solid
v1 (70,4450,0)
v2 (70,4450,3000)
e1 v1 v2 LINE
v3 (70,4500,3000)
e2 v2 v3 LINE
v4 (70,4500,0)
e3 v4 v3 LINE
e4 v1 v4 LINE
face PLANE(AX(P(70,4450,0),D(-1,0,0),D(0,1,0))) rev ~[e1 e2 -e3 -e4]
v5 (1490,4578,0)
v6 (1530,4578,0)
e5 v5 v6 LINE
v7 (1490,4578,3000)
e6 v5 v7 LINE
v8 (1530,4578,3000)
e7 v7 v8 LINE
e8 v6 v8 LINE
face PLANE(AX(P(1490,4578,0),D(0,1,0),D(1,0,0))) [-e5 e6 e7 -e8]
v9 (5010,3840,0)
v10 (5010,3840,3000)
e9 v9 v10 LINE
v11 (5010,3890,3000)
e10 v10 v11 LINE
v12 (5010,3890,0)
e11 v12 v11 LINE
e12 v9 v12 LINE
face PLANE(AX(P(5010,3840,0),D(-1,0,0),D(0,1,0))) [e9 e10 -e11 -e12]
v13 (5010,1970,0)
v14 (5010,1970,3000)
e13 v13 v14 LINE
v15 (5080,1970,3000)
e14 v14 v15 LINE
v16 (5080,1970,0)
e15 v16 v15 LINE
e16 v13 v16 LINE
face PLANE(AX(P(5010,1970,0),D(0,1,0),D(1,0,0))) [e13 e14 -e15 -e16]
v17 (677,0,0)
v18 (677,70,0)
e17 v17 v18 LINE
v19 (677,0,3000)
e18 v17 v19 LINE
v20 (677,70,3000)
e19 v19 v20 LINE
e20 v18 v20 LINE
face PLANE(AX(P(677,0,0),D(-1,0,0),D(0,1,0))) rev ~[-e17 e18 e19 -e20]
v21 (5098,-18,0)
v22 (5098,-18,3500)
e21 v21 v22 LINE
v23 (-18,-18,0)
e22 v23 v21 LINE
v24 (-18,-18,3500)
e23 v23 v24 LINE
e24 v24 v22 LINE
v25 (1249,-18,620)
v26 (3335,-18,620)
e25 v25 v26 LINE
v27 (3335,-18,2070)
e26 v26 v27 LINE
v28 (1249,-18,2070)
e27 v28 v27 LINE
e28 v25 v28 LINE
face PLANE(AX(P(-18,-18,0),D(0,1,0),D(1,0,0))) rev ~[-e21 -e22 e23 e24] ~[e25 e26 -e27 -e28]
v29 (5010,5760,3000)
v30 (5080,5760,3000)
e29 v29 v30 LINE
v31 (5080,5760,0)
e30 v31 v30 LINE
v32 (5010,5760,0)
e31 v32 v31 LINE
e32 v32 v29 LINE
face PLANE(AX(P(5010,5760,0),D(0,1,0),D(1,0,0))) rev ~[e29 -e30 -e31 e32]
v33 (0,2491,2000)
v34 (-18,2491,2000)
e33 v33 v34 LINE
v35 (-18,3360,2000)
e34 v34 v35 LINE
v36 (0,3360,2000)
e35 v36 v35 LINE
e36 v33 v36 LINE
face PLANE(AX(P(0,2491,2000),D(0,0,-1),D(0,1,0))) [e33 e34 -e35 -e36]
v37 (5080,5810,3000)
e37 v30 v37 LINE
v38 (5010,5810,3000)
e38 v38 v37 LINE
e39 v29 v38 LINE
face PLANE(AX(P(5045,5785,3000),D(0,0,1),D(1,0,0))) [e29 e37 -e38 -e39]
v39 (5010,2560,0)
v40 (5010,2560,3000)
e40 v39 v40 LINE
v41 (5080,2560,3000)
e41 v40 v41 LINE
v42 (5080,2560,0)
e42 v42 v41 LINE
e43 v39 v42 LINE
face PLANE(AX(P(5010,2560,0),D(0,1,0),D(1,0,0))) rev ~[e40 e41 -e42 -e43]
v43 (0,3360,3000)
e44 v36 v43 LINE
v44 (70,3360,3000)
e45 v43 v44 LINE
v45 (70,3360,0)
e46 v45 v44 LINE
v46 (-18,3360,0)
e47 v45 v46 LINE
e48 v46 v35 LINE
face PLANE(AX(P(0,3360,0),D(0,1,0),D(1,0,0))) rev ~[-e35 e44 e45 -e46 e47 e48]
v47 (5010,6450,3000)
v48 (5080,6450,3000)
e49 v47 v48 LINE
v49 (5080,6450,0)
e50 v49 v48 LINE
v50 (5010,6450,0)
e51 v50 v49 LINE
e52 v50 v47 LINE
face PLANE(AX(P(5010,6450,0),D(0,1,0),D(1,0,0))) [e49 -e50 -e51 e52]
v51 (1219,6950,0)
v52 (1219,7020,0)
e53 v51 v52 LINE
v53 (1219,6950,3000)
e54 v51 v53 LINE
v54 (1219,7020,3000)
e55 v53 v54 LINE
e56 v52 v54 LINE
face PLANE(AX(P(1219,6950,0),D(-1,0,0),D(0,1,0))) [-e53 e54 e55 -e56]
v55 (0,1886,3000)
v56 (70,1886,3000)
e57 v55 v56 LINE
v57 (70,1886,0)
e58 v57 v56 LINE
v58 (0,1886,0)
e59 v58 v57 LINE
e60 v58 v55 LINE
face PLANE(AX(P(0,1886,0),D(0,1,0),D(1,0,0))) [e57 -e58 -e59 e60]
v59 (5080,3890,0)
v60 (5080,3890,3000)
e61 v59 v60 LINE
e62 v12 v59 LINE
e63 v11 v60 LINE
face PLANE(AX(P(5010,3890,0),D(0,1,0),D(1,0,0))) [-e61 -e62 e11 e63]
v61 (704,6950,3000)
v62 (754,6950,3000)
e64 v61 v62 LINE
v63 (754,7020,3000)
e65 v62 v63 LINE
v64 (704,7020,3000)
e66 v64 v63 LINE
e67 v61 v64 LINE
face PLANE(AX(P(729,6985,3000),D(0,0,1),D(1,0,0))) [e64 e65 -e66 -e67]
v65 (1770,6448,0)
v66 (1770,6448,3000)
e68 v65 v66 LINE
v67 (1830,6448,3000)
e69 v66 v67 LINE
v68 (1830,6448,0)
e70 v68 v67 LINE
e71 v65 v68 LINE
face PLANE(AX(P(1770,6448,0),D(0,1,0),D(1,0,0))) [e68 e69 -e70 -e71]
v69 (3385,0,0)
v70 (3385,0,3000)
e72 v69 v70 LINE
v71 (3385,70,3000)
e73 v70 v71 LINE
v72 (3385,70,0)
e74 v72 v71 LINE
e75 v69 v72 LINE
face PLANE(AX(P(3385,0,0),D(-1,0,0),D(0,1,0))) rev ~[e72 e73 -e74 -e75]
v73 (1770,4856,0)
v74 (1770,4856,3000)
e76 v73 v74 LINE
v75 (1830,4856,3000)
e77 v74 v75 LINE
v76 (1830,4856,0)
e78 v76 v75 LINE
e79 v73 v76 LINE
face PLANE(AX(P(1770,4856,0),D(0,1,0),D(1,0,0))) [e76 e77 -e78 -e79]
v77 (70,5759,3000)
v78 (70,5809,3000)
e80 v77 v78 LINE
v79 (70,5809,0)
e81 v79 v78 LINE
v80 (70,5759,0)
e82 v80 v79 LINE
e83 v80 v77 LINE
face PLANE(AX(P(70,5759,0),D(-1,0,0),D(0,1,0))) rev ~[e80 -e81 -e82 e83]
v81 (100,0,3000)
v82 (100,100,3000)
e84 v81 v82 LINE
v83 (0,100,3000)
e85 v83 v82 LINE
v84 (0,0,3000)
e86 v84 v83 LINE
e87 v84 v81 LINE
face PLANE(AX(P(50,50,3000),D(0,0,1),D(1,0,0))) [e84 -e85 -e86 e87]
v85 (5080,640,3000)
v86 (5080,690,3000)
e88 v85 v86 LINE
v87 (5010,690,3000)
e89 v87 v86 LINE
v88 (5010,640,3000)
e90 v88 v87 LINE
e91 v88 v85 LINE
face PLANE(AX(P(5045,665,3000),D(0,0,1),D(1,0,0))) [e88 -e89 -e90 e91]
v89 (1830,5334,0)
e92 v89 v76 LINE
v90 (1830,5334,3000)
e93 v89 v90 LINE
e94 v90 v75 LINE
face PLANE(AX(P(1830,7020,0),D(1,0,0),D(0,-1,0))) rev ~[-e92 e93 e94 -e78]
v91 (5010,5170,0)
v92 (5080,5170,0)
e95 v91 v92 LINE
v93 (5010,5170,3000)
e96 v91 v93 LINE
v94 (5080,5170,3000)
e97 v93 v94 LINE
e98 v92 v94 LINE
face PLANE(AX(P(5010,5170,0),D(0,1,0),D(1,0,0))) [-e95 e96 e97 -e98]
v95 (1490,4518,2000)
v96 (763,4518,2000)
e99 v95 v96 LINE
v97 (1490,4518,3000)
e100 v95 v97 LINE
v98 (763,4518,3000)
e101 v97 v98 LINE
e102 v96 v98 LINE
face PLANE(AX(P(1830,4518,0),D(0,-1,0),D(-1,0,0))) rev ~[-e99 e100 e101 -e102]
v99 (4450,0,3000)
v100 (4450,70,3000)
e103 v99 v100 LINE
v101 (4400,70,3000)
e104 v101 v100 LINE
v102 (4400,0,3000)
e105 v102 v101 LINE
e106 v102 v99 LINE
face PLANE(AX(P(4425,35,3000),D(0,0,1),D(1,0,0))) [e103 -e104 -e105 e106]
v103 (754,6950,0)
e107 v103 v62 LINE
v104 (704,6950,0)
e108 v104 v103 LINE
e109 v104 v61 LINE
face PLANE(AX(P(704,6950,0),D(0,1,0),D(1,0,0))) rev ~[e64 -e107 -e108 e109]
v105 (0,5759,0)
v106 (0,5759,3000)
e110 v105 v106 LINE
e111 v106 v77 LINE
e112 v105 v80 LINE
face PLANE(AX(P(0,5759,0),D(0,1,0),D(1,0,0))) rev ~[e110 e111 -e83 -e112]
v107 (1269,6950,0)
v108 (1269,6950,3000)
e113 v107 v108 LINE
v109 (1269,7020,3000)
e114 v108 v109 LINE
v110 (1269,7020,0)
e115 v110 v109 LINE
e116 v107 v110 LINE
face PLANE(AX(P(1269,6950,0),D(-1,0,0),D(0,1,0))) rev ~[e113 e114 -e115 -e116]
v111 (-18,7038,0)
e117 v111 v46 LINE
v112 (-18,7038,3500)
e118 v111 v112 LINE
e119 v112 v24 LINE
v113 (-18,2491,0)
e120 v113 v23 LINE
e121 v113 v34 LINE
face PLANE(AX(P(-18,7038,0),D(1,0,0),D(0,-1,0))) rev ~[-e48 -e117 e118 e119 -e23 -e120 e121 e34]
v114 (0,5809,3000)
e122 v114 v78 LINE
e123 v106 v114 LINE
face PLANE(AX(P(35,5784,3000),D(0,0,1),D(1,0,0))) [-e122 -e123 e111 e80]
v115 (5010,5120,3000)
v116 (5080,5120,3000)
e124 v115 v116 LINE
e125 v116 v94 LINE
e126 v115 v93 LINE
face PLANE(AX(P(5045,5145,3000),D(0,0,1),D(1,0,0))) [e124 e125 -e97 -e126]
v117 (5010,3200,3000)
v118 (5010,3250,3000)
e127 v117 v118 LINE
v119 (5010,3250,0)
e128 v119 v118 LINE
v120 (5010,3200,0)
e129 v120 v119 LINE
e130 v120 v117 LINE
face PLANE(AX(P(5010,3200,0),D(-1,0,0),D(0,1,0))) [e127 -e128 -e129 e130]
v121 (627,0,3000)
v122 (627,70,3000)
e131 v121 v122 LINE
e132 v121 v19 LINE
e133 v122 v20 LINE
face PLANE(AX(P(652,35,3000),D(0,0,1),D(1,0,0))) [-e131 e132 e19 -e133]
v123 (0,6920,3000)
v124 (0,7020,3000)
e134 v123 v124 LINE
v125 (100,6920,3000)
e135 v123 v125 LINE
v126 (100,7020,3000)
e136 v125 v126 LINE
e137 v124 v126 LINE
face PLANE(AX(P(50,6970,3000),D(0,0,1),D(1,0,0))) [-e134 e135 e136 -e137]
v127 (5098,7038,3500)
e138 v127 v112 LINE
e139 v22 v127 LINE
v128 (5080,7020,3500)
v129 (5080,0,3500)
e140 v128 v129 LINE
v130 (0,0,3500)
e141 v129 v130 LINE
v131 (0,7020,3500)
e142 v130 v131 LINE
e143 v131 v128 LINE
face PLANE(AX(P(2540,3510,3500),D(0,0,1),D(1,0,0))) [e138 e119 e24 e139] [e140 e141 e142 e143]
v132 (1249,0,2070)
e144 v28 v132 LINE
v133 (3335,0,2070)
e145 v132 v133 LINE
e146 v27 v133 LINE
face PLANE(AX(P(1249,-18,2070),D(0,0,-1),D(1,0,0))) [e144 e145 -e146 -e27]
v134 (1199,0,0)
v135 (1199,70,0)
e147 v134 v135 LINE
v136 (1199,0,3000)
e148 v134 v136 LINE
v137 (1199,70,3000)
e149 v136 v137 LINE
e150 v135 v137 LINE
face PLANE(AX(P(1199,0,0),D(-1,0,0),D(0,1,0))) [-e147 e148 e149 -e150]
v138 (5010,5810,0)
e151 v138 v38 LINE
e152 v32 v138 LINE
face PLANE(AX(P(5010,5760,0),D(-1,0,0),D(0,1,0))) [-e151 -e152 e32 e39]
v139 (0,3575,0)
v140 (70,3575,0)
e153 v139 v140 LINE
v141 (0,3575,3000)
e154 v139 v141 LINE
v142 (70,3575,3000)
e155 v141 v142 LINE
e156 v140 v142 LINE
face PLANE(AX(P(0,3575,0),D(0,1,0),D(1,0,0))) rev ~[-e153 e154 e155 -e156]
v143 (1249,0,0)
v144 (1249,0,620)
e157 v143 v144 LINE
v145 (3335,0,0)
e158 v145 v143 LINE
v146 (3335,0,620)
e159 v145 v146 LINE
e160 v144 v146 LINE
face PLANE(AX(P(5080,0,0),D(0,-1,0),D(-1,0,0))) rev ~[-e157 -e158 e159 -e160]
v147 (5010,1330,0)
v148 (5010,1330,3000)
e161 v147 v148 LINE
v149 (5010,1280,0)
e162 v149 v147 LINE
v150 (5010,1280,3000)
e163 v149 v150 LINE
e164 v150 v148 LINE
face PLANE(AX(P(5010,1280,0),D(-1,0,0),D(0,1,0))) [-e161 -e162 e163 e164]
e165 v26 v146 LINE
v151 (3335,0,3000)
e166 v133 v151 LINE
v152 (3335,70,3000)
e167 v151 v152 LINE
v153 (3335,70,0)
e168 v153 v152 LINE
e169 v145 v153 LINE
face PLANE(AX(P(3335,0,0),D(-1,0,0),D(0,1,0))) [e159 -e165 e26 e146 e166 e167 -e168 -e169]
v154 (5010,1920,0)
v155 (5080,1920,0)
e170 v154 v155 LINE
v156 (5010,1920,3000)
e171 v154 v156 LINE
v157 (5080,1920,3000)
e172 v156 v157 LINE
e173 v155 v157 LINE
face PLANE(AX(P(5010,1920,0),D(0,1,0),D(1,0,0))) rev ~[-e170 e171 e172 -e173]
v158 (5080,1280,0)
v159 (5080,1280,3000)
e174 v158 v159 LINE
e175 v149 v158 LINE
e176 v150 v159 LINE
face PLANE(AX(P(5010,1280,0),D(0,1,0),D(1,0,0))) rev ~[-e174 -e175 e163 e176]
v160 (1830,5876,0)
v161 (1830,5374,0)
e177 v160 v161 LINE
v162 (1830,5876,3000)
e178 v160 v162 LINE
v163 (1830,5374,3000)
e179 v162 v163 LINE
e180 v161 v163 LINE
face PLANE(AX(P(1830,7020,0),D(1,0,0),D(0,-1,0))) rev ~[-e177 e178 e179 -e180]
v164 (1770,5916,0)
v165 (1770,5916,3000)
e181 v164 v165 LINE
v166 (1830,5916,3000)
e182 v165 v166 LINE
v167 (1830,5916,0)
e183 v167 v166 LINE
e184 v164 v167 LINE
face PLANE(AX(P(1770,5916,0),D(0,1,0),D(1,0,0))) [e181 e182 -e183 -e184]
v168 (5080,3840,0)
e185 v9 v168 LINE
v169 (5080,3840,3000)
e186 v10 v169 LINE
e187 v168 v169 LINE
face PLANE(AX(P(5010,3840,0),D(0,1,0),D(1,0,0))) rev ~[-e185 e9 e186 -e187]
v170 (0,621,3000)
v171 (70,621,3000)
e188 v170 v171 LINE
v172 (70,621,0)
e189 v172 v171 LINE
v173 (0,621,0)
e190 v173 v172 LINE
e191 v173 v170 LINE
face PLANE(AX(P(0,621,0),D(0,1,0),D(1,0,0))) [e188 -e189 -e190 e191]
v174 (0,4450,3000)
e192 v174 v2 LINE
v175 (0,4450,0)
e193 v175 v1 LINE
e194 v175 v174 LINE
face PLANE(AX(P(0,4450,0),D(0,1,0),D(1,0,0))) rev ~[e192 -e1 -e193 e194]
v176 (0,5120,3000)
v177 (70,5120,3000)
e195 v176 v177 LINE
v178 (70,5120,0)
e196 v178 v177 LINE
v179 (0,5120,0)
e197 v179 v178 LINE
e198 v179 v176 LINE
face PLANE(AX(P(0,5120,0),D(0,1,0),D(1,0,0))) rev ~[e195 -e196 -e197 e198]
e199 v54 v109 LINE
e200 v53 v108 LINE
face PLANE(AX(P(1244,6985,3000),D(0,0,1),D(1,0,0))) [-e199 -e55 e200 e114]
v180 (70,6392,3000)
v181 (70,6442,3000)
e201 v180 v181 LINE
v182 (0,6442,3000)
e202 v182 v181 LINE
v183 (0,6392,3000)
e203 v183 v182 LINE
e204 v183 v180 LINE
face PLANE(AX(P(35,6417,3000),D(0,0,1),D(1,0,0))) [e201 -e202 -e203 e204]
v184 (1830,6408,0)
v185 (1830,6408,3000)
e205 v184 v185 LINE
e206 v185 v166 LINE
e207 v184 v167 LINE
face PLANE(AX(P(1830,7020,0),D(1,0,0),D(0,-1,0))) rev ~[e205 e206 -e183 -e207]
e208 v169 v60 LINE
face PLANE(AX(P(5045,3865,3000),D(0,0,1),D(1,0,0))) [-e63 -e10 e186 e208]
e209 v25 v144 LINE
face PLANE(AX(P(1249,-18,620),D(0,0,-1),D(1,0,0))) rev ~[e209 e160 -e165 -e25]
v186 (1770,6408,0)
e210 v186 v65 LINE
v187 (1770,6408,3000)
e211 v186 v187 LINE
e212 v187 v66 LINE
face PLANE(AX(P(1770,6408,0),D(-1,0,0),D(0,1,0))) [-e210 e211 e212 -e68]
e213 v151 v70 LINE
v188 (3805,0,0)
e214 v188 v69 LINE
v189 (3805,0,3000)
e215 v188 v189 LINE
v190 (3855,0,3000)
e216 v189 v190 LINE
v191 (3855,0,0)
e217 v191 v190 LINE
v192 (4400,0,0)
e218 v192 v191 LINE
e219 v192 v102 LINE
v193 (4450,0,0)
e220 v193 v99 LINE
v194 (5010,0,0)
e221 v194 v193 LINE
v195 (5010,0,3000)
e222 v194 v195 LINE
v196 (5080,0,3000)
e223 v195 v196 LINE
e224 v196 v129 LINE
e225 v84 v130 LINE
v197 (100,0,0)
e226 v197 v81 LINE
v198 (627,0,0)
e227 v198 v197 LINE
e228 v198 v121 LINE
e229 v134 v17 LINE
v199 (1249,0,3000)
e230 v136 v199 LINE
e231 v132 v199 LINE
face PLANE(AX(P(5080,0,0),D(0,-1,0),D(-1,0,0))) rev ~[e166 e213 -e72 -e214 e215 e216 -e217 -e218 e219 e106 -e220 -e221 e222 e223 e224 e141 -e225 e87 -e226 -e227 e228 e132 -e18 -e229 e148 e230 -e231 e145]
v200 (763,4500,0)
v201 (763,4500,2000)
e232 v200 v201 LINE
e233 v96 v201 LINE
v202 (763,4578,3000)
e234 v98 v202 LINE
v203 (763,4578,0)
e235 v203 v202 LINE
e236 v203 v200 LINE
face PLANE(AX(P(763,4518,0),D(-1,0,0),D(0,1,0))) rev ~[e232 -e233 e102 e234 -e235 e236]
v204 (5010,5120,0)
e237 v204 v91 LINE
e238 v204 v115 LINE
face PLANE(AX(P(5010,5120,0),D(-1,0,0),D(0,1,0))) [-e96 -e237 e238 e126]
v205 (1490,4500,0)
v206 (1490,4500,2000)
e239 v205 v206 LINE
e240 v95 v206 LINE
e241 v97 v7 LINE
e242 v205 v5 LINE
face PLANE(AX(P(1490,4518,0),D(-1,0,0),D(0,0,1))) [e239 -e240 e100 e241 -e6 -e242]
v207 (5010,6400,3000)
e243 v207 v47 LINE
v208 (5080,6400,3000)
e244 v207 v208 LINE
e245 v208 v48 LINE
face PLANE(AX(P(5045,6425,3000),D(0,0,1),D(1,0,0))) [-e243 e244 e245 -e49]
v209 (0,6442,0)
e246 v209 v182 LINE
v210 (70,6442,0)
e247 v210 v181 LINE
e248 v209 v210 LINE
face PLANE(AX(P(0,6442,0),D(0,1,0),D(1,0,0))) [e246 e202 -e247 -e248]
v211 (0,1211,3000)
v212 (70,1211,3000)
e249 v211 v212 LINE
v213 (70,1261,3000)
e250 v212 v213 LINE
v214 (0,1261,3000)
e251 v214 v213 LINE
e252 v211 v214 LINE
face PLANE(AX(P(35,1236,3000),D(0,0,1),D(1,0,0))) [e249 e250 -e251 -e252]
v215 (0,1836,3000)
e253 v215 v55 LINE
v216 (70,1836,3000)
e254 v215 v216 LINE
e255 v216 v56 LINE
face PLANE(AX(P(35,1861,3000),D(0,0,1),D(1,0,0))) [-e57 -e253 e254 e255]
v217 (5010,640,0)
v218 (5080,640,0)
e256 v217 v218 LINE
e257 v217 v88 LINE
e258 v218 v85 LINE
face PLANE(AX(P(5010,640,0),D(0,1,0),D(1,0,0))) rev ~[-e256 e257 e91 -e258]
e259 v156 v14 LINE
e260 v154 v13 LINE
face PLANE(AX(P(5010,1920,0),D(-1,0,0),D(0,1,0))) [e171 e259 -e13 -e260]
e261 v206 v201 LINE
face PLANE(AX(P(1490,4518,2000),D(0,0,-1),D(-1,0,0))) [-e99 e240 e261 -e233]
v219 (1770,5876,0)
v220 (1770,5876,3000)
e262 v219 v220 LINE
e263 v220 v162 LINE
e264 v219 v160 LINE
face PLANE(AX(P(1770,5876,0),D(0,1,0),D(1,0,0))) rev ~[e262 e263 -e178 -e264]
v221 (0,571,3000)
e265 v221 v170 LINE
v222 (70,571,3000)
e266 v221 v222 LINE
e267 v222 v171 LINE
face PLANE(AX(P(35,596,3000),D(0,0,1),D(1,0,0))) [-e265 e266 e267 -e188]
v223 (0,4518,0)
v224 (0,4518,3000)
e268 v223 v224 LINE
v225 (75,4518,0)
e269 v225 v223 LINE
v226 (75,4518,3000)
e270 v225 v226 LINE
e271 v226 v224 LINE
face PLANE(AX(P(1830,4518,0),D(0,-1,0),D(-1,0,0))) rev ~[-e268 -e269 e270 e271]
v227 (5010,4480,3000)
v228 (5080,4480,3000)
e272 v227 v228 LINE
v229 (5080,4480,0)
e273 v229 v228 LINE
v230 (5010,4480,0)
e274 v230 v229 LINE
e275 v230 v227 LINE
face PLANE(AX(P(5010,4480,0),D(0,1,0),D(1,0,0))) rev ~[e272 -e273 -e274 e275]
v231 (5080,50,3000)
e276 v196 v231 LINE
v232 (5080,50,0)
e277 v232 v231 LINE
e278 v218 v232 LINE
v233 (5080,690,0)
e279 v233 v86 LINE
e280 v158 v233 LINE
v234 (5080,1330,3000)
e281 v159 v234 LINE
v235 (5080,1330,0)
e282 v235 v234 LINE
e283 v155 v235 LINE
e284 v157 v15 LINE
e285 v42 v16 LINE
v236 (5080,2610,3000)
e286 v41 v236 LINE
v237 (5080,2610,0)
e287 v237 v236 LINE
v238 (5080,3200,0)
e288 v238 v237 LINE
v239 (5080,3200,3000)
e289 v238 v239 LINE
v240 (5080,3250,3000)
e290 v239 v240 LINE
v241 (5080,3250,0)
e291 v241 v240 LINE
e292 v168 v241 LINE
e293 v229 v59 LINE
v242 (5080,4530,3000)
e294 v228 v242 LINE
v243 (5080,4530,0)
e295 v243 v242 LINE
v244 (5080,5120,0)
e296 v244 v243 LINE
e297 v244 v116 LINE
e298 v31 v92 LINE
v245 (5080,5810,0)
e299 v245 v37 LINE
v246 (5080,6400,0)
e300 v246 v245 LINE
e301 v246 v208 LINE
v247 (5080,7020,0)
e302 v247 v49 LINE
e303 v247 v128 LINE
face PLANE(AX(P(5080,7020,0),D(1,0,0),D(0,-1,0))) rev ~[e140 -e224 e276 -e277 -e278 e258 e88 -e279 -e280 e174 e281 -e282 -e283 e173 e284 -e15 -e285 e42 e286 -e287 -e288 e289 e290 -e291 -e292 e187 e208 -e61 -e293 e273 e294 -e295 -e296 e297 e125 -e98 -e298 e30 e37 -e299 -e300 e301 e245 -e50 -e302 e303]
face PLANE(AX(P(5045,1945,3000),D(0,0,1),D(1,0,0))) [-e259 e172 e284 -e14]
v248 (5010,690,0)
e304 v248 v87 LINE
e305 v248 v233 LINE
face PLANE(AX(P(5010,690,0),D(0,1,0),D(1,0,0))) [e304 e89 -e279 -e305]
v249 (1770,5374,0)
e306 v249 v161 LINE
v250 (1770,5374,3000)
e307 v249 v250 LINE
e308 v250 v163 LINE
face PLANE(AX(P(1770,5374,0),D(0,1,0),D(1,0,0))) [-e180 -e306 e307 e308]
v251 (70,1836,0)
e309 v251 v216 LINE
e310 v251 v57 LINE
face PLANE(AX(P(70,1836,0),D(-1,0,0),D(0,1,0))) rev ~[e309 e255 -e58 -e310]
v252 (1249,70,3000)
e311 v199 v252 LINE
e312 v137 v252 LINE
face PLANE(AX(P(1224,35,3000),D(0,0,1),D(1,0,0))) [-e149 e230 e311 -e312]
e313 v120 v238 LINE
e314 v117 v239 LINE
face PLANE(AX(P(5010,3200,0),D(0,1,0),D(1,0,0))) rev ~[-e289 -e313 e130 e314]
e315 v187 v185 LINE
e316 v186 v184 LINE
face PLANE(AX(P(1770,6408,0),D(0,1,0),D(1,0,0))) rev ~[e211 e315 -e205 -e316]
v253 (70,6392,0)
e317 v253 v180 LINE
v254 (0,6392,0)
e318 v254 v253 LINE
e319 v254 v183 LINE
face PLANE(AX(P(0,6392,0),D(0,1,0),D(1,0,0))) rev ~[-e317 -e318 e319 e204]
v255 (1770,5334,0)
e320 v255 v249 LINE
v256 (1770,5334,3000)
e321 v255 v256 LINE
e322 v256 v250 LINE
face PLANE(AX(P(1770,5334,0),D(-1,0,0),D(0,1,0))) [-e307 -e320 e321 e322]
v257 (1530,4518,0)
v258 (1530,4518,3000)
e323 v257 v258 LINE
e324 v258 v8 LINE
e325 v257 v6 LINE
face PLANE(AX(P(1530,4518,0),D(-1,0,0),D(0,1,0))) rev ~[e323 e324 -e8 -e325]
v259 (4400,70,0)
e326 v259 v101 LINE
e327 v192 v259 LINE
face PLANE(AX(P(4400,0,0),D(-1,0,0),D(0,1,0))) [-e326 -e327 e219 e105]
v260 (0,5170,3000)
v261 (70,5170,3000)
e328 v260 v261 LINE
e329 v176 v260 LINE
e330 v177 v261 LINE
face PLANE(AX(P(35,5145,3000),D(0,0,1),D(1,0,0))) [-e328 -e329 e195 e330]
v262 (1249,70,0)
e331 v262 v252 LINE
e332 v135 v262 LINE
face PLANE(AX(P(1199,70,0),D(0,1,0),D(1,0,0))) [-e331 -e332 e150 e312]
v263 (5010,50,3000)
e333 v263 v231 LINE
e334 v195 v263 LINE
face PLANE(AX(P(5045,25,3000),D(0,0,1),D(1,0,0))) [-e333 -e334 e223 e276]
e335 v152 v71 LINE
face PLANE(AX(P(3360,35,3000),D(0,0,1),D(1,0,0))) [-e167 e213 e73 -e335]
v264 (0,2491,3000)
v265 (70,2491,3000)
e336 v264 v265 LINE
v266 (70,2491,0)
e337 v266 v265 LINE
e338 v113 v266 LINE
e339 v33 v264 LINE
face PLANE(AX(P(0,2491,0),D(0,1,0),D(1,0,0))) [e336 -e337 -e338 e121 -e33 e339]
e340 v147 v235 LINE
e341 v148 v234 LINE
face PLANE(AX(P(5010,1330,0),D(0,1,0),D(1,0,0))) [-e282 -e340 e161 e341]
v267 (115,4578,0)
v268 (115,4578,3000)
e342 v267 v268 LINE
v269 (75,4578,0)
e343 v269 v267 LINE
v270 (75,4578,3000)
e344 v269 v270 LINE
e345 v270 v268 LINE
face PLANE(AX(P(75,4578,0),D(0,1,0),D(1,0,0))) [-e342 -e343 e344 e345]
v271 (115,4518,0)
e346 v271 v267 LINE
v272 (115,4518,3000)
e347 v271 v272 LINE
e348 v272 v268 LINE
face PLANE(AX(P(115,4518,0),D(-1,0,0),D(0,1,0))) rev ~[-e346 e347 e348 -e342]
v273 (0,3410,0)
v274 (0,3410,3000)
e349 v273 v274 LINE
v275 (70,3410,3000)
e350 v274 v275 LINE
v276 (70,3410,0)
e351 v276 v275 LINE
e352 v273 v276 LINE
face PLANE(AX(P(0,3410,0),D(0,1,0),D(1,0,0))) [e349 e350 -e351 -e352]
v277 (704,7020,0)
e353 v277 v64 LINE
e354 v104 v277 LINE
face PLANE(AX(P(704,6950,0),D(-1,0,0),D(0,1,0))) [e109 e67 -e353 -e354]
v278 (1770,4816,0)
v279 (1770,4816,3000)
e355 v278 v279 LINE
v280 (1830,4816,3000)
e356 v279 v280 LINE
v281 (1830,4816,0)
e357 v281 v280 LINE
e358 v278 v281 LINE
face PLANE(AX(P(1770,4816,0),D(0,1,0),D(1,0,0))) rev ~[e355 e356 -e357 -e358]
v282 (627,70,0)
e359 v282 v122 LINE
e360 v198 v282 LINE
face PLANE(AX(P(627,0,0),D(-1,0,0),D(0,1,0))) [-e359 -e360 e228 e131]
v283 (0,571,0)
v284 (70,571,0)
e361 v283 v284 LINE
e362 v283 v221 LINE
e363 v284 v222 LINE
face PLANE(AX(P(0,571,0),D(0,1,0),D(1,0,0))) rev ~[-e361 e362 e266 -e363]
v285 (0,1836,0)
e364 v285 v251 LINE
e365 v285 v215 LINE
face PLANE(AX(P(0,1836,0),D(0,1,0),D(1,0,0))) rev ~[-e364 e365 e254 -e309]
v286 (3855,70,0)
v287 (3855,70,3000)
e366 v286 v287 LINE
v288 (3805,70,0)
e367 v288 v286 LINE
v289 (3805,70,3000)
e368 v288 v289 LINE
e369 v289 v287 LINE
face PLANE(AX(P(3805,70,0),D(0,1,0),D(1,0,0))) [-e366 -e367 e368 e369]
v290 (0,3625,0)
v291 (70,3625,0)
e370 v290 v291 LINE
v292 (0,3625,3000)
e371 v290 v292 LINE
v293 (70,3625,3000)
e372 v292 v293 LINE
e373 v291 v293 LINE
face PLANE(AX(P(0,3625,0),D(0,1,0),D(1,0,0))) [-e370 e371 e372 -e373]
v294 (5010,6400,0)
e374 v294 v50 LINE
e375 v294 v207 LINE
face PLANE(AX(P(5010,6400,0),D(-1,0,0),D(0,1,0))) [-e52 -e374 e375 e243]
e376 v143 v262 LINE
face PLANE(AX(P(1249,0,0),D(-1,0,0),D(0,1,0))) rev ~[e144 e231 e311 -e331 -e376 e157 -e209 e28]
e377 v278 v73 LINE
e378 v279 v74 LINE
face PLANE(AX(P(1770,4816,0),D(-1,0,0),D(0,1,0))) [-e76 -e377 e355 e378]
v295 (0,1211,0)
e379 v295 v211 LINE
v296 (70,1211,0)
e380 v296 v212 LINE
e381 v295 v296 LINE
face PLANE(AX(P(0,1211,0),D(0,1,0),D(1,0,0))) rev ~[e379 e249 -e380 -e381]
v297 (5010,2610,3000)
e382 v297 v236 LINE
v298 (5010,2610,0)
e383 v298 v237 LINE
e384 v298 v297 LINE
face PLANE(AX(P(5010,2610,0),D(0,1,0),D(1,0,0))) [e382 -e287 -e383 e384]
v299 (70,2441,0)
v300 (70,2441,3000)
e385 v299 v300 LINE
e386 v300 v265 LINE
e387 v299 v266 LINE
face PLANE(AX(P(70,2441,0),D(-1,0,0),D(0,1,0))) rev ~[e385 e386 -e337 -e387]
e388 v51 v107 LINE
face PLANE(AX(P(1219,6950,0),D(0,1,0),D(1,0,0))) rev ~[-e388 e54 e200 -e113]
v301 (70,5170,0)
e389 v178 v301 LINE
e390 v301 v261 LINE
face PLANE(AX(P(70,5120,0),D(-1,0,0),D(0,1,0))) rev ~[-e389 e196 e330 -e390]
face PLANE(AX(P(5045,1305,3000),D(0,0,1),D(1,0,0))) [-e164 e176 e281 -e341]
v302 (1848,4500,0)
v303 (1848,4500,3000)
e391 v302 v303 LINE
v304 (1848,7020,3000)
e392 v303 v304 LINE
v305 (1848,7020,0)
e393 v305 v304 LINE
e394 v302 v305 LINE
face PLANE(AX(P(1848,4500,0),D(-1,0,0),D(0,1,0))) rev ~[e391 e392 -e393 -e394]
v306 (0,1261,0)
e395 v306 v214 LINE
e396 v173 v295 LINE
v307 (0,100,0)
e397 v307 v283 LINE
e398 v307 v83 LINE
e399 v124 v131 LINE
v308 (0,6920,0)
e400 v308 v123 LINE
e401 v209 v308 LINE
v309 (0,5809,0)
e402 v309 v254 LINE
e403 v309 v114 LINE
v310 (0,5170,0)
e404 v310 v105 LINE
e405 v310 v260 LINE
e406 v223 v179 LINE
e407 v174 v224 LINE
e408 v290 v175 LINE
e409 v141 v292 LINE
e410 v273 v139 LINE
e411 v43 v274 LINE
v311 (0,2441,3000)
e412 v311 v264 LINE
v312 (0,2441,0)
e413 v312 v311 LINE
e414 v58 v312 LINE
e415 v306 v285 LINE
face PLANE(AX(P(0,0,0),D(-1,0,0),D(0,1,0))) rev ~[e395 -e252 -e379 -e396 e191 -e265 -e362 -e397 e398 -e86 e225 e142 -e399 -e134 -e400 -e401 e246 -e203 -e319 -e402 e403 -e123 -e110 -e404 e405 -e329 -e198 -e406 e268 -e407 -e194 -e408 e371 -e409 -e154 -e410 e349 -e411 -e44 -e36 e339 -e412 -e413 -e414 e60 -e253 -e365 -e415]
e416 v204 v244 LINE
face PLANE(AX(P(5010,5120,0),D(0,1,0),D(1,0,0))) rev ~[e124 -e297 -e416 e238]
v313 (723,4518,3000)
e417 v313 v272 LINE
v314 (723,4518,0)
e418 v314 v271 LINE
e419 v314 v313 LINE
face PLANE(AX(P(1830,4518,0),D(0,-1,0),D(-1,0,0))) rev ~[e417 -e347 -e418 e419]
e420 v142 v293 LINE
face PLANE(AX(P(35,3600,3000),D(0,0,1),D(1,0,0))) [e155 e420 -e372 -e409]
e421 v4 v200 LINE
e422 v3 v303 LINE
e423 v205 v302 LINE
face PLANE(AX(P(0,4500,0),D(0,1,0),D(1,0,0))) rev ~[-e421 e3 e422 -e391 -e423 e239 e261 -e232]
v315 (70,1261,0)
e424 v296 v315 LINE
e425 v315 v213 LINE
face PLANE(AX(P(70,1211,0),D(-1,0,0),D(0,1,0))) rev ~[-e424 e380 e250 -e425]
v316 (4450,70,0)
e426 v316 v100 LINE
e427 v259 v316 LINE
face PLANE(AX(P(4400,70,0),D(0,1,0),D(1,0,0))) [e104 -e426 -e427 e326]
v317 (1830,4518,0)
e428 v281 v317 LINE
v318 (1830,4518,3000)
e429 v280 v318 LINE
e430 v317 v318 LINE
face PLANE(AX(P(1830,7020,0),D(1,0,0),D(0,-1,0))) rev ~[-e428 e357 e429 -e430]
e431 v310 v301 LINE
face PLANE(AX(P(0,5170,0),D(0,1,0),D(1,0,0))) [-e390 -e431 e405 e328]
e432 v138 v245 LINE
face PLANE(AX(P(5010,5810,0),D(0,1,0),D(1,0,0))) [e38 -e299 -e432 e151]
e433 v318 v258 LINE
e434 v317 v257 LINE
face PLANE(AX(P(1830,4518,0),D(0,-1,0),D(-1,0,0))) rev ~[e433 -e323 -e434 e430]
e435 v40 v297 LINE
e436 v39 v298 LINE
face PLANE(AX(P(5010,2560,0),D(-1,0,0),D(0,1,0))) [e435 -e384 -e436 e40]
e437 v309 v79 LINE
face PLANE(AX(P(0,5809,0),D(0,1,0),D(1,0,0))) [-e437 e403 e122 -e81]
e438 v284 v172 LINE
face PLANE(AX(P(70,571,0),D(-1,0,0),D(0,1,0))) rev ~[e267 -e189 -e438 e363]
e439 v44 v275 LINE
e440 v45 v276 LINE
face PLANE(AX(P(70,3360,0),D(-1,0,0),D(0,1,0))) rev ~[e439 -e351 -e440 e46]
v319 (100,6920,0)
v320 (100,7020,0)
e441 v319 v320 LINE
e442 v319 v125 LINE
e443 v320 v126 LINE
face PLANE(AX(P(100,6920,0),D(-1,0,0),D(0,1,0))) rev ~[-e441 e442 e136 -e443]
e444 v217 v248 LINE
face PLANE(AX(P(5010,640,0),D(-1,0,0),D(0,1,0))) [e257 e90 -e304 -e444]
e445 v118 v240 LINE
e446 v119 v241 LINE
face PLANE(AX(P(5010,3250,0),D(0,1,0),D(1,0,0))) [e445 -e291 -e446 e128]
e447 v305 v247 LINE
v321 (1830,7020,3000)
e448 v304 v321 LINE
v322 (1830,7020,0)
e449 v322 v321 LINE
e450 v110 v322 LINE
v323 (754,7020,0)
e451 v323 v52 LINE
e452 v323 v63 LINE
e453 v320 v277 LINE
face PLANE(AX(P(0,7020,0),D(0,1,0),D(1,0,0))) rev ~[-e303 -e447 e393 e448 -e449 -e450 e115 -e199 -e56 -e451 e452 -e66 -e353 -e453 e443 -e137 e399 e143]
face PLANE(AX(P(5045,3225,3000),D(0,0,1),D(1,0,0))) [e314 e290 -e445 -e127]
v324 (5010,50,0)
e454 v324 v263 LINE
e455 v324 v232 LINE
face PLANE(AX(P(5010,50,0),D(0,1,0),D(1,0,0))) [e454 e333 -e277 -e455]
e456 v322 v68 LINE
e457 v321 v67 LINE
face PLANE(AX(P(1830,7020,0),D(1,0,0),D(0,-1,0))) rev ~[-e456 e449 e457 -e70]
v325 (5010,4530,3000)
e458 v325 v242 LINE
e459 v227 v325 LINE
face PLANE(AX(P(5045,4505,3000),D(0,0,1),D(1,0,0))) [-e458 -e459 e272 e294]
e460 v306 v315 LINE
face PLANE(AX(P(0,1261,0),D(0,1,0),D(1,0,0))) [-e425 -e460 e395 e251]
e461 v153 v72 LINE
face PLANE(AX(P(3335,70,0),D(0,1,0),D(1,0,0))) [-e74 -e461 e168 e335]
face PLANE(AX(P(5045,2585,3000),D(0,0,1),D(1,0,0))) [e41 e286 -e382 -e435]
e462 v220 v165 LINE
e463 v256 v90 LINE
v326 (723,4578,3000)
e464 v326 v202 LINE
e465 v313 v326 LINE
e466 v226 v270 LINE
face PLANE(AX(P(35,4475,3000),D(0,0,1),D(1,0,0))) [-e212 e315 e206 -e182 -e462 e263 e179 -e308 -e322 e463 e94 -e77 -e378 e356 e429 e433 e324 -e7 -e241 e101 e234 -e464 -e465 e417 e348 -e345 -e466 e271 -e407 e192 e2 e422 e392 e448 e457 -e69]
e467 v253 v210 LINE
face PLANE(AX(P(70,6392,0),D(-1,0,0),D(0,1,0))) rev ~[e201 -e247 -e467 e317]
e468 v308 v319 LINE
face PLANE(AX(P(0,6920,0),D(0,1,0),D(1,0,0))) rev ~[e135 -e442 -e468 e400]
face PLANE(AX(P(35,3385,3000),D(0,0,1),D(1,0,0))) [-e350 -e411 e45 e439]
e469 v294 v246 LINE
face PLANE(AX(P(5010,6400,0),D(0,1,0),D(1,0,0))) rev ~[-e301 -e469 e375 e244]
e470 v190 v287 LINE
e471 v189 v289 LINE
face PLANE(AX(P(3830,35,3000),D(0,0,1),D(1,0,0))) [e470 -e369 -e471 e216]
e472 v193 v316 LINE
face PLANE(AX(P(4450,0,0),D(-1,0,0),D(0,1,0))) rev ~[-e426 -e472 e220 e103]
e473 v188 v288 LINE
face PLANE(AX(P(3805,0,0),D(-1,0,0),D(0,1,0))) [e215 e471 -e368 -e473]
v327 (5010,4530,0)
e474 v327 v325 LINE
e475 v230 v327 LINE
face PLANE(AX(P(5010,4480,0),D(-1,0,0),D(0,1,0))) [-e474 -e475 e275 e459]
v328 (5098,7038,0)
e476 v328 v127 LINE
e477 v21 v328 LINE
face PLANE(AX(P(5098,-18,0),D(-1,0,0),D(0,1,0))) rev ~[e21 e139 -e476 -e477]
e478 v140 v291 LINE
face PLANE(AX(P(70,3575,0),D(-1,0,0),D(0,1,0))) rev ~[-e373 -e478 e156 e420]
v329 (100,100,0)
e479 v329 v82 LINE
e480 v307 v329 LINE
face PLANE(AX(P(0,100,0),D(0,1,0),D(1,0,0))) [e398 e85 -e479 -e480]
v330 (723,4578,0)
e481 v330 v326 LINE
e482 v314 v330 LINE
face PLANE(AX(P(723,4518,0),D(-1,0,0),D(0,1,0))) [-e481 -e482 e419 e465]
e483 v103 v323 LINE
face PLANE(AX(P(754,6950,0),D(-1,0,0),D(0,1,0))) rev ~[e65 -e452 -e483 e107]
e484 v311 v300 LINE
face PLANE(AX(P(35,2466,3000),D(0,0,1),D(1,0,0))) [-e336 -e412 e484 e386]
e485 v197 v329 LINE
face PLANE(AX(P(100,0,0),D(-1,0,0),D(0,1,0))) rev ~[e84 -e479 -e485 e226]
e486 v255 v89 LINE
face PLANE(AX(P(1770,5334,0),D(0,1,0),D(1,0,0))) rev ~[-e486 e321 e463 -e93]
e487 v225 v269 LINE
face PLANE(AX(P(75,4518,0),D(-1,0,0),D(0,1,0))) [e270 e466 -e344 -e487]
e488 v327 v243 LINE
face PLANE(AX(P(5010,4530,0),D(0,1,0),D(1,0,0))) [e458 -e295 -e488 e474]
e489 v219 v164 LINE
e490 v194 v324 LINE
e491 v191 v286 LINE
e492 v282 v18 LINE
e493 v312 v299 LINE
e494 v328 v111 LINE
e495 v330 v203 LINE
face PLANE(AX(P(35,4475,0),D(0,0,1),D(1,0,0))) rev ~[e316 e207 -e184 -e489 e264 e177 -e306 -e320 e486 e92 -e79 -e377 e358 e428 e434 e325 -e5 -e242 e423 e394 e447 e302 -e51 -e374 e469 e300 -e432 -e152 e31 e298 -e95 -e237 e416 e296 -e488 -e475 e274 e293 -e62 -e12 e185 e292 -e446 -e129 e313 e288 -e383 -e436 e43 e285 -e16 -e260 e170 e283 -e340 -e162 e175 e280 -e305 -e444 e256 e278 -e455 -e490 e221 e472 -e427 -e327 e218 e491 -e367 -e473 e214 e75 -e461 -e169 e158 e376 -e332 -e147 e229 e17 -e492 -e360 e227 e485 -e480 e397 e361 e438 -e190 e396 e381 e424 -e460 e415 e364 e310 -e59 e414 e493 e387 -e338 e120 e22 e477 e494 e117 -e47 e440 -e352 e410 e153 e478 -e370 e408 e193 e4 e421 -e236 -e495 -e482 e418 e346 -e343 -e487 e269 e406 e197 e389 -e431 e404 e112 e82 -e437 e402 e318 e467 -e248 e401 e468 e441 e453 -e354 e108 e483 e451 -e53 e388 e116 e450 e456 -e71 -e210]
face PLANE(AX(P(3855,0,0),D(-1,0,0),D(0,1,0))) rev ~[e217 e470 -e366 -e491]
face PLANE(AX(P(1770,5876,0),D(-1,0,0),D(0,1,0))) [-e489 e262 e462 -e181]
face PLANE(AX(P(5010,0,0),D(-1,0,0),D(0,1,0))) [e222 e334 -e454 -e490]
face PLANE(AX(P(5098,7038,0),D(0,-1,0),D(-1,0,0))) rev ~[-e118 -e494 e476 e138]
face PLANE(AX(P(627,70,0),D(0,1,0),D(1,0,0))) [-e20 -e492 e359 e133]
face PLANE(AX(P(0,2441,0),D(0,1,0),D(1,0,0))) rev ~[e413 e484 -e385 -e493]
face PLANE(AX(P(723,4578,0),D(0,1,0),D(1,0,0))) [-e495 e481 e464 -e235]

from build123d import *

# Parameters (mm, degrees)
F4_DEPTH  = 3500
F6_DEPTH  = 3000
F2_W      = 70
F2_H      = 50
F2_W_2    = 100
F2_H_2    = 100
F2_W_3    = 50
F2_H_3    = 70
F2_W_4    = 60
F2_H_4    = 40
F2_W_5    = 40
F2_H_5    = 60
F7_DEPTH  = 3000
F8_W      = 2086
F8_H      = 1450
F9_DEPTH  = 18
F10_W     = 869
F10_H     = 2000
F11_DEPTH = 18
F12_W     = 727
F12_H     = 2000
F13_DEPTH = 18


# Not quite as in the source:
# - a feature names something its author has since deleted; it is built from what else it names


with BuildPart() as f4:
    # F3 (on face) → F4 (new body)
    with BuildSketch(Plane.XY):
        Polygon((1830, 7038), (-18, 7038), (-18, 4500), (-18, -18), (5098, -18), (5098, 7038), align=None)
        Polygon((0, 4500), (0, 7020), (1830, 7020), (5080, 7020), (5080, 0), (0, 0), align=None, mode=Mode.SUBTRACT)
    extrude(amount=F4_DEPTH)

    # F5 (on face) → F6 (join)
    with BuildSketch(Plane.XY):
        Polygon((0, 4518), (0, 4500), (1830, 4500), (1848, 4500), (1848, 7020), (1830, 7020), (1830, 4518), align=None)
    extrude(amount=F6_DEPTH)

    # F2 (on Top) → F7 (join)
    with BuildSketch(Plane.XY):
        with Locations((35, 4475)):
            Rectangle(F2_W, F2_H)
        with Locations((35, 3600)):
            Rectangle(F2_W, F2_H)
        with Locations((35, 3385)):
            Rectangle(F2_W, F2_H)
        with Locations((35, 2466)):
            Rectangle(F2_W, F2_H)
        with Locations((35, 1861)):
            Rectangle(F2_W, F2_H)
        with Locations((35, 1236)):
            Rectangle(F2_W, F2_H)
        with Locations((35, 596)):
            Rectangle(F2_W, F2_H)
        with Locations((50, 50)):
            Rectangle(F2_W_2, F2_H_2)
        with Locations((652, 35)):
            Rectangle(F2_W_3, F2_H_3)
        with Locations((1224, 35)):
            Rectangle(F2_W_3, F2_H_3)
        with Locations((3360, 35)):
            Rectangle(F2_W_3, F2_H_3)
        with Locations((3830, 35)):
            Rectangle(F2_W_3, F2_H_3)
        with Locations((4425, 35)):
            Rectangle(F2_W_3, F2_H_3)
        with Locations((5045, 25)):
            Rectangle(F2_W, F2_H)
        with Locations((5045, 665)):
            Rectangle(F2_W, F2_H)
        with Locations((5045, 1305)):
            Rectangle(F2_W, F2_H)
        with Locations((5045, 1945)):
            Rectangle(F2_W, F2_H)
        with Locations((5045, 2585)):
            Rectangle(F2_W, F2_H)
        with Locations((5045, 3225)):
            Rectangle(F2_W, F2_H)
        with Locations((5045, 3865)):
            Rectangle(F2_W, F2_H)
        with Locations((5045, 4505)):
            Rectangle(F2_W, F2_H)
        with Locations((5045, 5145)):
            Rectangle(F2_W, F2_H)
        with Locations((5045, 5785)):
            Rectangle(F2_W, F2_H)
        with Locations((5045, 6425)):
            Rectangle(F2_W, F2_H)
        with Locations((50, 6970)):
            Rectangle(F2_W_2, F2_H_2)
        with Locations((729, 6985)):
            Rectangle(F2_W_3, F2_H_3)
        with Locations((1244, 6985)):
            Rectangle(F2_W_3, F2_H_3)
        with Locations((1800, 6428)):
            Rectangle(F2_W_4, F2_H_4)
        with Locations((1800, 5896)):
            Rectangle(F2_W_4, F2_H_4)
        with Locations((1800, 5354)):
            Rectangle(F2_W_4, F2_H_4)
        with Locations((1800, 4836)):
            Rectangle(F2_W_4, F2_H_4)
        with Locations((35, 6417)):
            Rectangle(F2_W, F2_H)
        with Locations((35, 5784)):
            Rectangle(F2_W, F2_H)
        with Locations((35, 5145)):
            Rectangle(F2_W, F2_H)
        with Locations((95, 4548)):
            Rectangle(F2_W_5, F2_H_5)
        with Locations((743, 4548)):
            Rectangle(F2_W_5, F2_H_5)
        with Locations((1510, 4548)):
            Rectangle(F2_W_5, F2_H_5)
    extrude(amount=F7_DEPTH)

    # F8 (on face) → F9 (cut, through all)
    with BuildSketch(Plane.XZ.offset(18)):
        with Locations((2292, 1345)):
            Rectangle(F8_W, F8_H)
    extrude(amount=-F9_DEPTH, mode=Mode.SUBTRACT)

    # F10 (on face) → F11 (cut, through all)
    with BuildSketch(Plane.YZ):
        with Locations((2925.5, 1000)):
            Rectangle(F10_W, F10_H)
    extrude(amount=-F11_DEPTH, mode=Mode.SUBTRACT)

    # F12 (on face) → F13 (cut, through all)
    with BuildSketch(Plane(origin=(0, 4518, 0), x_dir=(-1, 0, 0), z_dir=(0, 1, 0))):
        with Locations((-1126.5, 1000)):
            Rectangle(F12_W, F12_H)
    extrude(amount=-F13_DEPTH, mode=Mode.SUBTRACT)


solid = f4.part
